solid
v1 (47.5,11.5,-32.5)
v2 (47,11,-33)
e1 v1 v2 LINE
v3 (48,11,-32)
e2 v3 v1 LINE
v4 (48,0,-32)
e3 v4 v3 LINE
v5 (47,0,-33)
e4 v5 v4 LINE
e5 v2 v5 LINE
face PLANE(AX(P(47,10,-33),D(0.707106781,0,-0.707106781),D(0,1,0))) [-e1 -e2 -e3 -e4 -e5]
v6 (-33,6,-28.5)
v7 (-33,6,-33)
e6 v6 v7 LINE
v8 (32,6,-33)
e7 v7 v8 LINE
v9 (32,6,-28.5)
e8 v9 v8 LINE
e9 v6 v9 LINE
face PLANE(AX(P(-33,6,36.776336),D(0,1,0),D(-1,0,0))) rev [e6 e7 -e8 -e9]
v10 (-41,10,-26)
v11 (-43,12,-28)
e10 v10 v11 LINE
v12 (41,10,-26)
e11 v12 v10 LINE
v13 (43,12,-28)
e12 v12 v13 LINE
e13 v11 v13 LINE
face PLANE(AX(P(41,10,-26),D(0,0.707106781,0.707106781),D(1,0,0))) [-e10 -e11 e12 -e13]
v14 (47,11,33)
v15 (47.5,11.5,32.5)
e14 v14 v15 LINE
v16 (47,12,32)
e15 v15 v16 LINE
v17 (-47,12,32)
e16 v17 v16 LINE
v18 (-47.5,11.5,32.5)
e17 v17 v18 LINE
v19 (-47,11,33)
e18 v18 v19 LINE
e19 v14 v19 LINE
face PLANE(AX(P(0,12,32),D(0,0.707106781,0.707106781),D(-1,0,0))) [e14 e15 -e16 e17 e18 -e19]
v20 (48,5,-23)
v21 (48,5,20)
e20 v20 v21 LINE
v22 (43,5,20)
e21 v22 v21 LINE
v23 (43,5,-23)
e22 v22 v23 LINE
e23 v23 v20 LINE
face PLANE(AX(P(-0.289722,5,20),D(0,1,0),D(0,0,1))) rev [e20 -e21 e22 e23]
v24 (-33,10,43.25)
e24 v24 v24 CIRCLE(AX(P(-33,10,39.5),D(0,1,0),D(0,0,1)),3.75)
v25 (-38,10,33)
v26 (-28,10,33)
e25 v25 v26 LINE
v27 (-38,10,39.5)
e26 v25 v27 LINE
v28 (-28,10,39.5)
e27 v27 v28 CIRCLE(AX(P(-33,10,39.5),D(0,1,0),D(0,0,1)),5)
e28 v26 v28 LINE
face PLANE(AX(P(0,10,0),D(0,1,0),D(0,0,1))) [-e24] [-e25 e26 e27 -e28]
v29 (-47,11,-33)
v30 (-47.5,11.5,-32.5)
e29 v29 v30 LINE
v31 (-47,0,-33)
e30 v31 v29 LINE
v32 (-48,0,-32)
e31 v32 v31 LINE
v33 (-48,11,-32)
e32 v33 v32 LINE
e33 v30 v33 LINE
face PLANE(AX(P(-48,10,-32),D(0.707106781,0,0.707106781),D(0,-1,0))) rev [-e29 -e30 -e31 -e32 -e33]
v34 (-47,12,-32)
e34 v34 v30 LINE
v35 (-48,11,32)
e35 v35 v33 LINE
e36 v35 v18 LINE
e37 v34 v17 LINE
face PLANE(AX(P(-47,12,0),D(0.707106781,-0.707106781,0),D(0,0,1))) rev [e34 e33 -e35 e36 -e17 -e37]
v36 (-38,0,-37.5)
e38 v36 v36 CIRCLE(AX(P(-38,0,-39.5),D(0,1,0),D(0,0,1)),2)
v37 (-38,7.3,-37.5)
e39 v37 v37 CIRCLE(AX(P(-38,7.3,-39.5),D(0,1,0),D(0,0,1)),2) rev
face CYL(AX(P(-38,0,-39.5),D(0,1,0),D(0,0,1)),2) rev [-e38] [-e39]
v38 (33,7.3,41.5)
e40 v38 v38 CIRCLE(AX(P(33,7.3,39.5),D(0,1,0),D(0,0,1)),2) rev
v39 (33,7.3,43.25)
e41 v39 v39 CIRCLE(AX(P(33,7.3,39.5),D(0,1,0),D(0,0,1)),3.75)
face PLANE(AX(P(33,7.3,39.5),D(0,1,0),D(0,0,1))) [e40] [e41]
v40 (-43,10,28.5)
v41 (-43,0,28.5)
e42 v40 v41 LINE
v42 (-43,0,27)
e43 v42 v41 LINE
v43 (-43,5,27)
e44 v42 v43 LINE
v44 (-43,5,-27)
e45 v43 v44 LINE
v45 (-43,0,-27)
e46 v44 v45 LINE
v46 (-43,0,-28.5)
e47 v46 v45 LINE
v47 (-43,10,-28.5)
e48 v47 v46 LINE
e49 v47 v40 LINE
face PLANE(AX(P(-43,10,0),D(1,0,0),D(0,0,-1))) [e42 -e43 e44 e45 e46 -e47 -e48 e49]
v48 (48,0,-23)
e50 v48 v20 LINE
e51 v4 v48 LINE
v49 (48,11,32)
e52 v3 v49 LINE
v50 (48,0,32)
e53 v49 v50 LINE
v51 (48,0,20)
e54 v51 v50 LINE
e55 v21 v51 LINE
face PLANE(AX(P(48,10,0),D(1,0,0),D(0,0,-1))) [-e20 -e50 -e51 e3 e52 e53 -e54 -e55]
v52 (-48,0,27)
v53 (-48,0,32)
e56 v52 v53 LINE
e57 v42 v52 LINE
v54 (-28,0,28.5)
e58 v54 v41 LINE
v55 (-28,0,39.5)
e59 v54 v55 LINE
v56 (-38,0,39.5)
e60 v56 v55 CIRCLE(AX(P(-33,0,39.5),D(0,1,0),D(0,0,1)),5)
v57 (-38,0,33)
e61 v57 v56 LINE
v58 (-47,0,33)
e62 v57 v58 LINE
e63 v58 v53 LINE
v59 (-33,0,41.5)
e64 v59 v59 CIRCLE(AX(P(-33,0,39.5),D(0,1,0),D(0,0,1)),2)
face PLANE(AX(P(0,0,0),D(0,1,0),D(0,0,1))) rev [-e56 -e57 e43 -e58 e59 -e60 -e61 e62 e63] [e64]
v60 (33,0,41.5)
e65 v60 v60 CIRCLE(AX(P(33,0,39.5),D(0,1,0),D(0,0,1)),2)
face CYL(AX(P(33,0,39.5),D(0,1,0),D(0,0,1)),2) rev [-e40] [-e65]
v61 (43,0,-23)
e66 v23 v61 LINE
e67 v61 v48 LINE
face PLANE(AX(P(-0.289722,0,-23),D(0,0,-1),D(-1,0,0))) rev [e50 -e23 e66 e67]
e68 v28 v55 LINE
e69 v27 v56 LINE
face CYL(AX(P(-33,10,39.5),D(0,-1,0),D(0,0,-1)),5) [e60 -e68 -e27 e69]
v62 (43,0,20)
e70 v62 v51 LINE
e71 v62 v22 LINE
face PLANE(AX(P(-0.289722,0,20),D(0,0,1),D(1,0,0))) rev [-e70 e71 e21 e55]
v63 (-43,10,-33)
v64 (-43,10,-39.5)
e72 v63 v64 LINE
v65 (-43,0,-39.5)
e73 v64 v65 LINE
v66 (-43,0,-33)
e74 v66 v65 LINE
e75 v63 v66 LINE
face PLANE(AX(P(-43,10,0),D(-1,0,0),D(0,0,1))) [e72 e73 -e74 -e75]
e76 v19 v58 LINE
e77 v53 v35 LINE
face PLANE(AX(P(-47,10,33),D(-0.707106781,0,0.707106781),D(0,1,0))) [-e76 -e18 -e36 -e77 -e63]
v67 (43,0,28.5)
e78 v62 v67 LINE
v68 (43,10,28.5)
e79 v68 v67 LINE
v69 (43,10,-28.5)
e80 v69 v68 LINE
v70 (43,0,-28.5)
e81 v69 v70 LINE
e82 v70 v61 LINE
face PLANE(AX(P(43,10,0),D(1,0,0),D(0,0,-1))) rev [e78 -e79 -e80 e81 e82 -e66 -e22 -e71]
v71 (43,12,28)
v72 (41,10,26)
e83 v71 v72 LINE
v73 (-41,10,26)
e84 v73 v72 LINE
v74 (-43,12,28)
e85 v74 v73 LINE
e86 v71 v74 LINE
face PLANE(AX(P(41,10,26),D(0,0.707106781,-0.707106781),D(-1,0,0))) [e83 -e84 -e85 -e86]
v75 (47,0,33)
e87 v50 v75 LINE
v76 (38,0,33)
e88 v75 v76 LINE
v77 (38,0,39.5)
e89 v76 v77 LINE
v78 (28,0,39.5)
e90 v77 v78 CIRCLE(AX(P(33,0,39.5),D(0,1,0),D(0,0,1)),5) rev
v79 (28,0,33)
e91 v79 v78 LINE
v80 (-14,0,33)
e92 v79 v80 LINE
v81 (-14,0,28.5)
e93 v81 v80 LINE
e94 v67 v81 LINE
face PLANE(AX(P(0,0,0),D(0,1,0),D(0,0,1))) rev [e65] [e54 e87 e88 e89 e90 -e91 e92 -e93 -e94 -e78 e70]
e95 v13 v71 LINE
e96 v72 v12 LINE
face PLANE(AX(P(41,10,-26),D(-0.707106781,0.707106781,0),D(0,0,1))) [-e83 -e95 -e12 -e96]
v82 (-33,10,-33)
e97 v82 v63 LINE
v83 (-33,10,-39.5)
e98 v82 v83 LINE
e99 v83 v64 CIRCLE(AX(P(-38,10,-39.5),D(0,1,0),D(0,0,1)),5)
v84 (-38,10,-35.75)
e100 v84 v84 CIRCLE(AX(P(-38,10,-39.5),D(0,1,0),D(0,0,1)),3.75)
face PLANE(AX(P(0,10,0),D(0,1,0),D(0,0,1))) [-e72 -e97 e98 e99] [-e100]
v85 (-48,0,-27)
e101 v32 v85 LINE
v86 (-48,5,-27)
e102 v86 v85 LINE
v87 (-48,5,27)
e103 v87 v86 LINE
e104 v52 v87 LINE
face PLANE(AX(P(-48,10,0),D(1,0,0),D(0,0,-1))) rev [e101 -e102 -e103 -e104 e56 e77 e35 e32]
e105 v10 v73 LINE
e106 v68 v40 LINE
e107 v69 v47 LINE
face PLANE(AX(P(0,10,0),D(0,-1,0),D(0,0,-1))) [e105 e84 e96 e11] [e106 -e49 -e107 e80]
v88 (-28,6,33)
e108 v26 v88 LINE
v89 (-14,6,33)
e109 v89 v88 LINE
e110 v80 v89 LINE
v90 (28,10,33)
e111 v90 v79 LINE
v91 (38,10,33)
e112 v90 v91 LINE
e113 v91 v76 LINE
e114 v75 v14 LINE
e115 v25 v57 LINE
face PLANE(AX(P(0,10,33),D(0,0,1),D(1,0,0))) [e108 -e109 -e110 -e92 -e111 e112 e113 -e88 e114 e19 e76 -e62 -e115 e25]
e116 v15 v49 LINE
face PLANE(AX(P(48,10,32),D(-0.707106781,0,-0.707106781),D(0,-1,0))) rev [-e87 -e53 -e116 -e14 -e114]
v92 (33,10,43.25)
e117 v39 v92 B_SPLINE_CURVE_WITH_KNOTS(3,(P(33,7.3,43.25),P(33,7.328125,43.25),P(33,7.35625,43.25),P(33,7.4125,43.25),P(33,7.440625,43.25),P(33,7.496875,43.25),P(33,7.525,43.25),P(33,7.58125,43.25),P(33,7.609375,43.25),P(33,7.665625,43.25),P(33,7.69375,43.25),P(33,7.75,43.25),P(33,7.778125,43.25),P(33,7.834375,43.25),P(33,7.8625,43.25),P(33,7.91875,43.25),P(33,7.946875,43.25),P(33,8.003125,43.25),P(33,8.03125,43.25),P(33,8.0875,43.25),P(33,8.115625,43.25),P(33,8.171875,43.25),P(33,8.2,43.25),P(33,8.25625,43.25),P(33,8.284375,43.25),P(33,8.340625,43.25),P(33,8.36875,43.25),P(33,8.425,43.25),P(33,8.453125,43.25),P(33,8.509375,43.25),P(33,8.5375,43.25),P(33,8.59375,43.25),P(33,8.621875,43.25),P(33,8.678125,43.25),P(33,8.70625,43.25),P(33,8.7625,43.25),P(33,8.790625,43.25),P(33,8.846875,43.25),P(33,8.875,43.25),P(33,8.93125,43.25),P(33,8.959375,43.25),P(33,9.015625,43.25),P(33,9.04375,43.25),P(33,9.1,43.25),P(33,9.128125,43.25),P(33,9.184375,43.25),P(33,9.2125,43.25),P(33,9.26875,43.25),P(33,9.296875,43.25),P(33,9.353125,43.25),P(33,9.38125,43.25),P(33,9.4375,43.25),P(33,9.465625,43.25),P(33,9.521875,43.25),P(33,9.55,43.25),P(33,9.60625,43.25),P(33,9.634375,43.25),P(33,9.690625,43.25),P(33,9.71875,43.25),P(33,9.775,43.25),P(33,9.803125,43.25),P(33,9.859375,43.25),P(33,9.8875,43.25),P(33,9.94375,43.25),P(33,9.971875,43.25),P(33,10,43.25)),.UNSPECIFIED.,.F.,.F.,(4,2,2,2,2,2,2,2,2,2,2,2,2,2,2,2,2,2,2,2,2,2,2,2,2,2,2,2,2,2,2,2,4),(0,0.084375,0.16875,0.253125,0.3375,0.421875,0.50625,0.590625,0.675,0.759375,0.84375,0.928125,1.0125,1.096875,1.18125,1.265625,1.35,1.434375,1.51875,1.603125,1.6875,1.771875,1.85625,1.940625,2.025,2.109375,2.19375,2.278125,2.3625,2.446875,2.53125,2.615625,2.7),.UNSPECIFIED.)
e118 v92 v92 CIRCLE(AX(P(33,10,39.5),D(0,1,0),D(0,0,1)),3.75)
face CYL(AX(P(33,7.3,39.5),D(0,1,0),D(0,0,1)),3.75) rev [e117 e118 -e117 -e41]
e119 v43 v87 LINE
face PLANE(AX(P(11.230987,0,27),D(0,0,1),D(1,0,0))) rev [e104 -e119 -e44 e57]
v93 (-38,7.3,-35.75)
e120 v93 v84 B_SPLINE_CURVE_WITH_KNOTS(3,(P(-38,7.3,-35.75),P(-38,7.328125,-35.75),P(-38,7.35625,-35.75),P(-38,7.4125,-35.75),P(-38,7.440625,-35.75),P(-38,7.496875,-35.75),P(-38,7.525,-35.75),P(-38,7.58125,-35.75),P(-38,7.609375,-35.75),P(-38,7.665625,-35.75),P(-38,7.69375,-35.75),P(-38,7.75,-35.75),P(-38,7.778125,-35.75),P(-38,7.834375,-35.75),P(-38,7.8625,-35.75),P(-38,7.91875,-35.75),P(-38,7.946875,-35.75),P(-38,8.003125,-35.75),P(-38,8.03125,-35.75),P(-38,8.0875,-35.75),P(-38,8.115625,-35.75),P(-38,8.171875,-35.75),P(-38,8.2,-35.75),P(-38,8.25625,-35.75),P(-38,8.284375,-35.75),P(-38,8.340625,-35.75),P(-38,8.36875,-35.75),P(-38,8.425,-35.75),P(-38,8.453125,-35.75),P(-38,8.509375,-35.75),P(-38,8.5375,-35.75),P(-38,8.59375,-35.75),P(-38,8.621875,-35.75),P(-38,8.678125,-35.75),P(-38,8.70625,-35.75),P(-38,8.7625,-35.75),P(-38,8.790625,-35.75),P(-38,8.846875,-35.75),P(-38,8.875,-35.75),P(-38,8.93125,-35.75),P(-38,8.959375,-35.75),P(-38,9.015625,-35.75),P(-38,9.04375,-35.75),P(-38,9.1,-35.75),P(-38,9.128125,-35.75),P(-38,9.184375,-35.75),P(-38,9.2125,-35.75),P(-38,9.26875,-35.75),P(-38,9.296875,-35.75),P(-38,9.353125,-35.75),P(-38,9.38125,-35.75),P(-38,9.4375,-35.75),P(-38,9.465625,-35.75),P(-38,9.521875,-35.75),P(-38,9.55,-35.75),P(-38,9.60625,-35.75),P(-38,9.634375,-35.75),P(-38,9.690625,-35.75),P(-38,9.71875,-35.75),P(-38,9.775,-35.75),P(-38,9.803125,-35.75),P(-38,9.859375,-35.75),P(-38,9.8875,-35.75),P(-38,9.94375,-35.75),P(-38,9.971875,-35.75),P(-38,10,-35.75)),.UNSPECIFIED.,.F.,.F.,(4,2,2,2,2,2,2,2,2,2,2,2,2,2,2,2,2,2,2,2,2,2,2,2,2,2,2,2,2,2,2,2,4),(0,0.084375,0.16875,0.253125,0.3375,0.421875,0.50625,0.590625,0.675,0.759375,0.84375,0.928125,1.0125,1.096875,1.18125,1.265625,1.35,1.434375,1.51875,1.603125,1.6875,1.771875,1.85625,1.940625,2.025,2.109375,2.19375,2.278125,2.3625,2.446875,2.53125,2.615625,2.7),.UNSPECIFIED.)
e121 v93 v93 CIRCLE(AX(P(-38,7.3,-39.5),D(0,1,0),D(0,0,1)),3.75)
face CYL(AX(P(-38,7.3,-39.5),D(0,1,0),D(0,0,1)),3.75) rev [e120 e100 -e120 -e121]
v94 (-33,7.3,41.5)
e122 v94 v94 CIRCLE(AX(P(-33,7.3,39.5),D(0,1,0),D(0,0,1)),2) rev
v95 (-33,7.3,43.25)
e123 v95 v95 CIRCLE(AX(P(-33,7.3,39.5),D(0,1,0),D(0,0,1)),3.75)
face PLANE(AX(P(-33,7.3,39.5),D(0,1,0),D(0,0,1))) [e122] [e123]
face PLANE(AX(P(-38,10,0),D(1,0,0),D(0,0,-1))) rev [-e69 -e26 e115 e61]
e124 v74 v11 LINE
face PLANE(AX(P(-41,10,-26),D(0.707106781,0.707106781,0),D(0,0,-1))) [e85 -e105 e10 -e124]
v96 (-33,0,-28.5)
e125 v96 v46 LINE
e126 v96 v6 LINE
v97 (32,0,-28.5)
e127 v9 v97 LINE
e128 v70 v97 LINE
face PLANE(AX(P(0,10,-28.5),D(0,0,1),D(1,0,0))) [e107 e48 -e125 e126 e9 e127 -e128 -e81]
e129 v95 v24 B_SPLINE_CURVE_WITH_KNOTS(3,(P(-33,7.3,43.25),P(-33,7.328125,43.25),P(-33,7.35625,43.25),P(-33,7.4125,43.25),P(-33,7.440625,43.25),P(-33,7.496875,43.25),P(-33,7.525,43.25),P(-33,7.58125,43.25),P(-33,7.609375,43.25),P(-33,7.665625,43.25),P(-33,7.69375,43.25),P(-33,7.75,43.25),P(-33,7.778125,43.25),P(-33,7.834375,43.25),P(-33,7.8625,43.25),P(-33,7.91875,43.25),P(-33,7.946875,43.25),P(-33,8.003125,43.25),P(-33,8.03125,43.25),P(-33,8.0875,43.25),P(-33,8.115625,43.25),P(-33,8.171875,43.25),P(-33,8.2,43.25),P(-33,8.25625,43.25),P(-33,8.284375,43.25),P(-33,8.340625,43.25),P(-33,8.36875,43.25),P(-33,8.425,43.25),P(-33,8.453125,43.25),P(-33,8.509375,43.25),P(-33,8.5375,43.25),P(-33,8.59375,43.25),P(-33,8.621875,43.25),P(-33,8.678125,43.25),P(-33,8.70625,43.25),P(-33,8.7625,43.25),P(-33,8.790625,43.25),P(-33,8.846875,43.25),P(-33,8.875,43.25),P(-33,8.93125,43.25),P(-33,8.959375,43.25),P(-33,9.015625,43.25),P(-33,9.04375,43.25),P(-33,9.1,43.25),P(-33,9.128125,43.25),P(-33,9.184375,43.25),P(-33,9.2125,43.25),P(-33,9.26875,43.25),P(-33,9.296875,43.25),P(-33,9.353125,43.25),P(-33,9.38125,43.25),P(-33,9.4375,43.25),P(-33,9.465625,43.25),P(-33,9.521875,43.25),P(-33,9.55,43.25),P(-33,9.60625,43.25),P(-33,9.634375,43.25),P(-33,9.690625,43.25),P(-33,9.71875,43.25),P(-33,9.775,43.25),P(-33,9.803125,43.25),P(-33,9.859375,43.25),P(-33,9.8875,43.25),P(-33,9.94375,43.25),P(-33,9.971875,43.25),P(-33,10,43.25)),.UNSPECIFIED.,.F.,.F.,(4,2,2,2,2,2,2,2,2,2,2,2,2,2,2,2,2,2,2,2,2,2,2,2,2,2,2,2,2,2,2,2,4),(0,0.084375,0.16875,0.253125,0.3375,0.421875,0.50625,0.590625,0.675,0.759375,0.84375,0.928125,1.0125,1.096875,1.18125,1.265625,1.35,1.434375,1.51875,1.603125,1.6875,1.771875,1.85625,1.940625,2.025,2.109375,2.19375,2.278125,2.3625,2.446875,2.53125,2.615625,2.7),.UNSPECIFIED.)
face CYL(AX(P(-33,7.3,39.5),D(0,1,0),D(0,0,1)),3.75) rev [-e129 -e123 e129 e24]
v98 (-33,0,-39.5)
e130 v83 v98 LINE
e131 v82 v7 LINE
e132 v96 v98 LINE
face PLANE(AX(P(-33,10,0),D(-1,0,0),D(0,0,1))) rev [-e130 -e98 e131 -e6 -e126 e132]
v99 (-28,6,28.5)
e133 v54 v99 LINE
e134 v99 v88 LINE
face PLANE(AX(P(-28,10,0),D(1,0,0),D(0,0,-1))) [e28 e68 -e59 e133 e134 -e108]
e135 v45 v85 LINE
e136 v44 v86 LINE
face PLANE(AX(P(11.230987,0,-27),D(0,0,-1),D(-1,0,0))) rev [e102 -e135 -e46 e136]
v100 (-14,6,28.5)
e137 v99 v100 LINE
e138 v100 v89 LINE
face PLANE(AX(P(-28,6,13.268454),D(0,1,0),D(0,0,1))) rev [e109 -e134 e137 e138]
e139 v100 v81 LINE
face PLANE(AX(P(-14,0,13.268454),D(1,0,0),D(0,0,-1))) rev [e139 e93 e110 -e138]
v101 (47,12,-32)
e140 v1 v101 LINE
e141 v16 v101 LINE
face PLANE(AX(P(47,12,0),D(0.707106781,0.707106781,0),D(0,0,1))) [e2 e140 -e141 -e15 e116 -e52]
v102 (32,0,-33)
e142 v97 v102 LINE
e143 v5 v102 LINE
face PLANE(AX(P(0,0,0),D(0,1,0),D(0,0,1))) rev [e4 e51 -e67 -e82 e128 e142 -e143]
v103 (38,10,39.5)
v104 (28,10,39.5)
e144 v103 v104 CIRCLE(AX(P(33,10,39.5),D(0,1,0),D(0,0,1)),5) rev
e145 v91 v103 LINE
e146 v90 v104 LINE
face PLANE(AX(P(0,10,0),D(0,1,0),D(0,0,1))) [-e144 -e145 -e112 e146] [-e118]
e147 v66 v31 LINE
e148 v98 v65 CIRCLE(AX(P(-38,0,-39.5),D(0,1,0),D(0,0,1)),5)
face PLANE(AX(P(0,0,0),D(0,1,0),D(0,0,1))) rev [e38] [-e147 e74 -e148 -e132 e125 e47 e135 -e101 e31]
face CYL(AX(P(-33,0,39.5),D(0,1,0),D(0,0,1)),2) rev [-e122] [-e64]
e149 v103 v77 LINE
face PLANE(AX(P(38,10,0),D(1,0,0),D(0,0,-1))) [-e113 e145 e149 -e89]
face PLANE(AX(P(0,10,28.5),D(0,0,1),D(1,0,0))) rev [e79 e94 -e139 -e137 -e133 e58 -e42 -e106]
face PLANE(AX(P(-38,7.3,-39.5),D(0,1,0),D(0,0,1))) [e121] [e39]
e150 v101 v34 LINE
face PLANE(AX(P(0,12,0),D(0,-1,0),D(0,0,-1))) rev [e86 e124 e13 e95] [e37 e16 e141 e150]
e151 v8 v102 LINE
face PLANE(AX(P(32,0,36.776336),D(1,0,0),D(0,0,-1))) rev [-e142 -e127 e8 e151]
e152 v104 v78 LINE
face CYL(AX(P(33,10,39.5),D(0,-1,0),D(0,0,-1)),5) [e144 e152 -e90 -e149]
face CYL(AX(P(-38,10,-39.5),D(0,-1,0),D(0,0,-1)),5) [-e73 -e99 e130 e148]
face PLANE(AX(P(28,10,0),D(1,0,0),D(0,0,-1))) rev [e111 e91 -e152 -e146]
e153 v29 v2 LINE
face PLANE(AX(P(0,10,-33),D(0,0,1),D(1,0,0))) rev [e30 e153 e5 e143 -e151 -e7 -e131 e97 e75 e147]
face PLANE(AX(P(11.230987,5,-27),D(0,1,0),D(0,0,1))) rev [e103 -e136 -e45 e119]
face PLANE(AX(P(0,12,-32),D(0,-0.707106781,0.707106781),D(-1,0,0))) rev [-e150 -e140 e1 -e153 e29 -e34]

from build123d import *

# Parameters (mm, degrees)
SKETCH1_W           = 86
SKETCH1_H           = 57
BOSS_EXTRUDE1_DEPTH = 10
SKETCH2_R           = 2
CUT_EXTRUDE1_DEPTH  = 67.213669284
SKETCH4_W           = 96
SKETCH4_H           = 66
SKETCH4_W_2         = 82
SKETCH4_H_2         = 52
BOSS_EXTRUDE2_DEPTH = 2
SKETCH6_W           = 54
SKETCH6_H           = 5
CUT_EXTRUDE2_DEPTH  = 5
SKETCH7_W           = 43
SKETCH7_H           = 5
CUT_EXTRUDE3_DEPTH  = 5
CHAMFER1_SIZE       = 2
CHAMFER2_SIZE       = 1
CHAMFER3_SIZE       = 1
CHAMFER4_SIZE       = 1
SKETCH9_R           = 3.75
CUT_EXTRUDE4_DEPTH  = 2.7
SKETCH10_W          = 65
SKETCH10_H          = 6
CUT_EXTRUDE5_DEPTH  = 4.5
SKETCH11_W          = 14
SKETCH11_H          = 6
CUT_EXTRUDE6_DEPTH  = 4.5


with BuildPart() as part:
    # Sketch1 → Boss-Extrude1 (new body)
    with BuildSketch(Plane(origin=(0, 0, 0), x_dir=(1, 0, 0), z_dir=(0, 1, 0))):
        with BuildLine():
            Line((48, -33), (48, 33))
            Line((48, 33), (-33, 33))
            Line((-33, 33), (-33, 39.5))
            ThreePointArc((-33, 39.5), (-38, 44.5), (-43, 39.5))
            Line((-43, 39.5), (-43, 33))
            Line((-43, 33), (-48, 33))
            Line((-48, 33), (-48, -33))
            Line((-48, -33), (-38, -33))
            Line((-38, -33), (-38, -39.5))
            ThreePointArc((-38, -39.5), (-33, -44.5), (-28, -39.5))
            Line((-28, -39.5), (-28, -33))
            Line((-28, -33), (28, -33))
            Line((28, -33), (28, -39.5))
            ThreePointArc((28, -39.5), (33, -44.5), (38, -39.5))
            Line((38, -39.5), (38, -33))
            Line((38, -33), (48, -33))
        make_face()
        Rectangle(SKETCH1_W, SKETCH1_H, mode=Mode.SUBTRACT)
    extrude(amount=BOSS_EXTRUDE1_DEPTH)

    # Sketch2 → Cut-Extrude1 (cut, through all)
    with BuildSketch(Plane(origin=(0, 10, 0), x_dir=(1, 0, 0), z_dir=(0, 1, 0))):
        with Locations(Location((-38, 39.5, 0), (0, 0, 270))):
            Circle(SKETCH2_R)
        with Locations(Location((33, -39.5, 0), (0, 0, 270))):
            Circle(SKETCH2_R)
        with Locations(Location((-33, -39.5, 0), (0, 0, 270))):
            Circle(SKETCH2_R)
    extrude(amount=-CUT_EXTRUDE1_DEPTH, mode=Mode.SUBTRACT)

    # Sketch4 → Boss-Extrude2 (add)
    with BuildSketch(Plane(origin=(0, 10, 0), x_dir=(1, 0, 0), z_dir=(0, 1, 0))):
        Rectangle(SKETCH4_W, SKETCH4_H)
        Rectangle(SKETCH4_W_2, SKETCH4_H_2, mode=Mode.SUBTRACT)
    extrude(amount=BOSS_EXTRUDE2_DEPTH)

    # Sketch6 → Cut-Extrude2 (cut)
    with BuildSketch(Plane.ZY.offset(48)):
        with Locations((0, 2.5)):
            Rectangle(SKETCH6_W, SKETCH6_H)
    extrude(amount=-CUT_EXTRUDE2_DEPTH, mode=Mode.SUBTRACT)

    # Sketch7 → Cut-Extrude3 (cut)
    with BuildSketch(Plane(origin=(48, 0, 0), x_dir=(0, 0, -1), z_dir=(1, 0, 0))):
        with Locations((1.5, 2.5)):
            Rectangle(SKETCH7_W, SKETCH7_H)
    extrude(amount=-CUT_EXTRUDE3_DEPTH, mode=Mode.SUBTRACT)

    # Chamfer1
    chamfer1_edges = [part.edges().sort_by_distance(p)[0] for p in [
        (-41, 12, 0),
        (0, 12, 26),
        (41, 12, 0),
        (0, 12, -26),
    ]]
    chamfer(chamfer1_edges, length=CHAMFER1_SIZE - 0.0001)  # a hair under: the kernel refuses the full size

    # Chamfer2
    chamfer2_edges = [part.edges().sort_by_distance(p)[0] for p in [
        (-48, 12, 0),
        (0, 12, 33),
        (48, 12, 0),
        (0, 12, -33),
    ]]
    chamfer(chamfer2_edges, length=CHAMFER2_SIZE)

    # Chamfer3
    chamfer3_edges = [part.edges().sort_by_distance(p)[0] for p in [
        (-48, 5.5, -33),
    ]]
    chamfer(chamfer3_edges, length=CHAMFER3_SIZE)

    # Chamfer4
    chamfer4_edges = [part.edges().sort_by_distance(p)[0] for p in [
        (48, 5.5, 33),
        (-48, 5.5, 33),
        (48, 5.5, -33),
    ]]
    chamfer(chamfer4_edges, length=CHAMFER4_SIZE)

    # Sketch9 → Cut-Extrude4 (cut)
    with BuildSketch(Plane(origin=(0, 10, 0), x_dir=(1, 0, 0), z_dir=(0, 1, 0))):
        with Locations(Location((-38, 39.5, 0), (0, 0, 270))):
            Circle(SKETCH9_R)
        with Locations(Location((-33, -39.5, 0), (0, 0, 270))):
            Circle(SKETCH9_R)
        with Locations(Location((33, -39.5, 0), (0, 0, 270))):
            Circle(SKETCH9_R)
    extrude(amount=-CUT_EXTRUDE4_DEPTH, mode=Mode.SUBTRACT)

    # Sketch10 → Cut-Extrude5 (cut)
    with BuildSketch(Plane(origin=(0, 0, -33), x_dir=(-1, 0, 0), z_dir=(0, 0, -1))):
        with Locations((0.5, 3)):
            Rectangle(SKETCH10_W, SKETCH10_H)
    extrude(amount=-CUT_EXTRUDE5_DEPTH, mode=Mode.SUBTRACT)

    # Sketch11 → Cut-Extrude6 (cut)
    with BuildSketch(Plane.XY.offset(33)):
        with Locations((-21, 3)):
            Rectangle(SKETCH11_W, SKETCH11_H)
    extrude(amount=-CUT_EXTRUDE6_DEPTH, mode=Mode.SUBTRACT)


solid = part.part
